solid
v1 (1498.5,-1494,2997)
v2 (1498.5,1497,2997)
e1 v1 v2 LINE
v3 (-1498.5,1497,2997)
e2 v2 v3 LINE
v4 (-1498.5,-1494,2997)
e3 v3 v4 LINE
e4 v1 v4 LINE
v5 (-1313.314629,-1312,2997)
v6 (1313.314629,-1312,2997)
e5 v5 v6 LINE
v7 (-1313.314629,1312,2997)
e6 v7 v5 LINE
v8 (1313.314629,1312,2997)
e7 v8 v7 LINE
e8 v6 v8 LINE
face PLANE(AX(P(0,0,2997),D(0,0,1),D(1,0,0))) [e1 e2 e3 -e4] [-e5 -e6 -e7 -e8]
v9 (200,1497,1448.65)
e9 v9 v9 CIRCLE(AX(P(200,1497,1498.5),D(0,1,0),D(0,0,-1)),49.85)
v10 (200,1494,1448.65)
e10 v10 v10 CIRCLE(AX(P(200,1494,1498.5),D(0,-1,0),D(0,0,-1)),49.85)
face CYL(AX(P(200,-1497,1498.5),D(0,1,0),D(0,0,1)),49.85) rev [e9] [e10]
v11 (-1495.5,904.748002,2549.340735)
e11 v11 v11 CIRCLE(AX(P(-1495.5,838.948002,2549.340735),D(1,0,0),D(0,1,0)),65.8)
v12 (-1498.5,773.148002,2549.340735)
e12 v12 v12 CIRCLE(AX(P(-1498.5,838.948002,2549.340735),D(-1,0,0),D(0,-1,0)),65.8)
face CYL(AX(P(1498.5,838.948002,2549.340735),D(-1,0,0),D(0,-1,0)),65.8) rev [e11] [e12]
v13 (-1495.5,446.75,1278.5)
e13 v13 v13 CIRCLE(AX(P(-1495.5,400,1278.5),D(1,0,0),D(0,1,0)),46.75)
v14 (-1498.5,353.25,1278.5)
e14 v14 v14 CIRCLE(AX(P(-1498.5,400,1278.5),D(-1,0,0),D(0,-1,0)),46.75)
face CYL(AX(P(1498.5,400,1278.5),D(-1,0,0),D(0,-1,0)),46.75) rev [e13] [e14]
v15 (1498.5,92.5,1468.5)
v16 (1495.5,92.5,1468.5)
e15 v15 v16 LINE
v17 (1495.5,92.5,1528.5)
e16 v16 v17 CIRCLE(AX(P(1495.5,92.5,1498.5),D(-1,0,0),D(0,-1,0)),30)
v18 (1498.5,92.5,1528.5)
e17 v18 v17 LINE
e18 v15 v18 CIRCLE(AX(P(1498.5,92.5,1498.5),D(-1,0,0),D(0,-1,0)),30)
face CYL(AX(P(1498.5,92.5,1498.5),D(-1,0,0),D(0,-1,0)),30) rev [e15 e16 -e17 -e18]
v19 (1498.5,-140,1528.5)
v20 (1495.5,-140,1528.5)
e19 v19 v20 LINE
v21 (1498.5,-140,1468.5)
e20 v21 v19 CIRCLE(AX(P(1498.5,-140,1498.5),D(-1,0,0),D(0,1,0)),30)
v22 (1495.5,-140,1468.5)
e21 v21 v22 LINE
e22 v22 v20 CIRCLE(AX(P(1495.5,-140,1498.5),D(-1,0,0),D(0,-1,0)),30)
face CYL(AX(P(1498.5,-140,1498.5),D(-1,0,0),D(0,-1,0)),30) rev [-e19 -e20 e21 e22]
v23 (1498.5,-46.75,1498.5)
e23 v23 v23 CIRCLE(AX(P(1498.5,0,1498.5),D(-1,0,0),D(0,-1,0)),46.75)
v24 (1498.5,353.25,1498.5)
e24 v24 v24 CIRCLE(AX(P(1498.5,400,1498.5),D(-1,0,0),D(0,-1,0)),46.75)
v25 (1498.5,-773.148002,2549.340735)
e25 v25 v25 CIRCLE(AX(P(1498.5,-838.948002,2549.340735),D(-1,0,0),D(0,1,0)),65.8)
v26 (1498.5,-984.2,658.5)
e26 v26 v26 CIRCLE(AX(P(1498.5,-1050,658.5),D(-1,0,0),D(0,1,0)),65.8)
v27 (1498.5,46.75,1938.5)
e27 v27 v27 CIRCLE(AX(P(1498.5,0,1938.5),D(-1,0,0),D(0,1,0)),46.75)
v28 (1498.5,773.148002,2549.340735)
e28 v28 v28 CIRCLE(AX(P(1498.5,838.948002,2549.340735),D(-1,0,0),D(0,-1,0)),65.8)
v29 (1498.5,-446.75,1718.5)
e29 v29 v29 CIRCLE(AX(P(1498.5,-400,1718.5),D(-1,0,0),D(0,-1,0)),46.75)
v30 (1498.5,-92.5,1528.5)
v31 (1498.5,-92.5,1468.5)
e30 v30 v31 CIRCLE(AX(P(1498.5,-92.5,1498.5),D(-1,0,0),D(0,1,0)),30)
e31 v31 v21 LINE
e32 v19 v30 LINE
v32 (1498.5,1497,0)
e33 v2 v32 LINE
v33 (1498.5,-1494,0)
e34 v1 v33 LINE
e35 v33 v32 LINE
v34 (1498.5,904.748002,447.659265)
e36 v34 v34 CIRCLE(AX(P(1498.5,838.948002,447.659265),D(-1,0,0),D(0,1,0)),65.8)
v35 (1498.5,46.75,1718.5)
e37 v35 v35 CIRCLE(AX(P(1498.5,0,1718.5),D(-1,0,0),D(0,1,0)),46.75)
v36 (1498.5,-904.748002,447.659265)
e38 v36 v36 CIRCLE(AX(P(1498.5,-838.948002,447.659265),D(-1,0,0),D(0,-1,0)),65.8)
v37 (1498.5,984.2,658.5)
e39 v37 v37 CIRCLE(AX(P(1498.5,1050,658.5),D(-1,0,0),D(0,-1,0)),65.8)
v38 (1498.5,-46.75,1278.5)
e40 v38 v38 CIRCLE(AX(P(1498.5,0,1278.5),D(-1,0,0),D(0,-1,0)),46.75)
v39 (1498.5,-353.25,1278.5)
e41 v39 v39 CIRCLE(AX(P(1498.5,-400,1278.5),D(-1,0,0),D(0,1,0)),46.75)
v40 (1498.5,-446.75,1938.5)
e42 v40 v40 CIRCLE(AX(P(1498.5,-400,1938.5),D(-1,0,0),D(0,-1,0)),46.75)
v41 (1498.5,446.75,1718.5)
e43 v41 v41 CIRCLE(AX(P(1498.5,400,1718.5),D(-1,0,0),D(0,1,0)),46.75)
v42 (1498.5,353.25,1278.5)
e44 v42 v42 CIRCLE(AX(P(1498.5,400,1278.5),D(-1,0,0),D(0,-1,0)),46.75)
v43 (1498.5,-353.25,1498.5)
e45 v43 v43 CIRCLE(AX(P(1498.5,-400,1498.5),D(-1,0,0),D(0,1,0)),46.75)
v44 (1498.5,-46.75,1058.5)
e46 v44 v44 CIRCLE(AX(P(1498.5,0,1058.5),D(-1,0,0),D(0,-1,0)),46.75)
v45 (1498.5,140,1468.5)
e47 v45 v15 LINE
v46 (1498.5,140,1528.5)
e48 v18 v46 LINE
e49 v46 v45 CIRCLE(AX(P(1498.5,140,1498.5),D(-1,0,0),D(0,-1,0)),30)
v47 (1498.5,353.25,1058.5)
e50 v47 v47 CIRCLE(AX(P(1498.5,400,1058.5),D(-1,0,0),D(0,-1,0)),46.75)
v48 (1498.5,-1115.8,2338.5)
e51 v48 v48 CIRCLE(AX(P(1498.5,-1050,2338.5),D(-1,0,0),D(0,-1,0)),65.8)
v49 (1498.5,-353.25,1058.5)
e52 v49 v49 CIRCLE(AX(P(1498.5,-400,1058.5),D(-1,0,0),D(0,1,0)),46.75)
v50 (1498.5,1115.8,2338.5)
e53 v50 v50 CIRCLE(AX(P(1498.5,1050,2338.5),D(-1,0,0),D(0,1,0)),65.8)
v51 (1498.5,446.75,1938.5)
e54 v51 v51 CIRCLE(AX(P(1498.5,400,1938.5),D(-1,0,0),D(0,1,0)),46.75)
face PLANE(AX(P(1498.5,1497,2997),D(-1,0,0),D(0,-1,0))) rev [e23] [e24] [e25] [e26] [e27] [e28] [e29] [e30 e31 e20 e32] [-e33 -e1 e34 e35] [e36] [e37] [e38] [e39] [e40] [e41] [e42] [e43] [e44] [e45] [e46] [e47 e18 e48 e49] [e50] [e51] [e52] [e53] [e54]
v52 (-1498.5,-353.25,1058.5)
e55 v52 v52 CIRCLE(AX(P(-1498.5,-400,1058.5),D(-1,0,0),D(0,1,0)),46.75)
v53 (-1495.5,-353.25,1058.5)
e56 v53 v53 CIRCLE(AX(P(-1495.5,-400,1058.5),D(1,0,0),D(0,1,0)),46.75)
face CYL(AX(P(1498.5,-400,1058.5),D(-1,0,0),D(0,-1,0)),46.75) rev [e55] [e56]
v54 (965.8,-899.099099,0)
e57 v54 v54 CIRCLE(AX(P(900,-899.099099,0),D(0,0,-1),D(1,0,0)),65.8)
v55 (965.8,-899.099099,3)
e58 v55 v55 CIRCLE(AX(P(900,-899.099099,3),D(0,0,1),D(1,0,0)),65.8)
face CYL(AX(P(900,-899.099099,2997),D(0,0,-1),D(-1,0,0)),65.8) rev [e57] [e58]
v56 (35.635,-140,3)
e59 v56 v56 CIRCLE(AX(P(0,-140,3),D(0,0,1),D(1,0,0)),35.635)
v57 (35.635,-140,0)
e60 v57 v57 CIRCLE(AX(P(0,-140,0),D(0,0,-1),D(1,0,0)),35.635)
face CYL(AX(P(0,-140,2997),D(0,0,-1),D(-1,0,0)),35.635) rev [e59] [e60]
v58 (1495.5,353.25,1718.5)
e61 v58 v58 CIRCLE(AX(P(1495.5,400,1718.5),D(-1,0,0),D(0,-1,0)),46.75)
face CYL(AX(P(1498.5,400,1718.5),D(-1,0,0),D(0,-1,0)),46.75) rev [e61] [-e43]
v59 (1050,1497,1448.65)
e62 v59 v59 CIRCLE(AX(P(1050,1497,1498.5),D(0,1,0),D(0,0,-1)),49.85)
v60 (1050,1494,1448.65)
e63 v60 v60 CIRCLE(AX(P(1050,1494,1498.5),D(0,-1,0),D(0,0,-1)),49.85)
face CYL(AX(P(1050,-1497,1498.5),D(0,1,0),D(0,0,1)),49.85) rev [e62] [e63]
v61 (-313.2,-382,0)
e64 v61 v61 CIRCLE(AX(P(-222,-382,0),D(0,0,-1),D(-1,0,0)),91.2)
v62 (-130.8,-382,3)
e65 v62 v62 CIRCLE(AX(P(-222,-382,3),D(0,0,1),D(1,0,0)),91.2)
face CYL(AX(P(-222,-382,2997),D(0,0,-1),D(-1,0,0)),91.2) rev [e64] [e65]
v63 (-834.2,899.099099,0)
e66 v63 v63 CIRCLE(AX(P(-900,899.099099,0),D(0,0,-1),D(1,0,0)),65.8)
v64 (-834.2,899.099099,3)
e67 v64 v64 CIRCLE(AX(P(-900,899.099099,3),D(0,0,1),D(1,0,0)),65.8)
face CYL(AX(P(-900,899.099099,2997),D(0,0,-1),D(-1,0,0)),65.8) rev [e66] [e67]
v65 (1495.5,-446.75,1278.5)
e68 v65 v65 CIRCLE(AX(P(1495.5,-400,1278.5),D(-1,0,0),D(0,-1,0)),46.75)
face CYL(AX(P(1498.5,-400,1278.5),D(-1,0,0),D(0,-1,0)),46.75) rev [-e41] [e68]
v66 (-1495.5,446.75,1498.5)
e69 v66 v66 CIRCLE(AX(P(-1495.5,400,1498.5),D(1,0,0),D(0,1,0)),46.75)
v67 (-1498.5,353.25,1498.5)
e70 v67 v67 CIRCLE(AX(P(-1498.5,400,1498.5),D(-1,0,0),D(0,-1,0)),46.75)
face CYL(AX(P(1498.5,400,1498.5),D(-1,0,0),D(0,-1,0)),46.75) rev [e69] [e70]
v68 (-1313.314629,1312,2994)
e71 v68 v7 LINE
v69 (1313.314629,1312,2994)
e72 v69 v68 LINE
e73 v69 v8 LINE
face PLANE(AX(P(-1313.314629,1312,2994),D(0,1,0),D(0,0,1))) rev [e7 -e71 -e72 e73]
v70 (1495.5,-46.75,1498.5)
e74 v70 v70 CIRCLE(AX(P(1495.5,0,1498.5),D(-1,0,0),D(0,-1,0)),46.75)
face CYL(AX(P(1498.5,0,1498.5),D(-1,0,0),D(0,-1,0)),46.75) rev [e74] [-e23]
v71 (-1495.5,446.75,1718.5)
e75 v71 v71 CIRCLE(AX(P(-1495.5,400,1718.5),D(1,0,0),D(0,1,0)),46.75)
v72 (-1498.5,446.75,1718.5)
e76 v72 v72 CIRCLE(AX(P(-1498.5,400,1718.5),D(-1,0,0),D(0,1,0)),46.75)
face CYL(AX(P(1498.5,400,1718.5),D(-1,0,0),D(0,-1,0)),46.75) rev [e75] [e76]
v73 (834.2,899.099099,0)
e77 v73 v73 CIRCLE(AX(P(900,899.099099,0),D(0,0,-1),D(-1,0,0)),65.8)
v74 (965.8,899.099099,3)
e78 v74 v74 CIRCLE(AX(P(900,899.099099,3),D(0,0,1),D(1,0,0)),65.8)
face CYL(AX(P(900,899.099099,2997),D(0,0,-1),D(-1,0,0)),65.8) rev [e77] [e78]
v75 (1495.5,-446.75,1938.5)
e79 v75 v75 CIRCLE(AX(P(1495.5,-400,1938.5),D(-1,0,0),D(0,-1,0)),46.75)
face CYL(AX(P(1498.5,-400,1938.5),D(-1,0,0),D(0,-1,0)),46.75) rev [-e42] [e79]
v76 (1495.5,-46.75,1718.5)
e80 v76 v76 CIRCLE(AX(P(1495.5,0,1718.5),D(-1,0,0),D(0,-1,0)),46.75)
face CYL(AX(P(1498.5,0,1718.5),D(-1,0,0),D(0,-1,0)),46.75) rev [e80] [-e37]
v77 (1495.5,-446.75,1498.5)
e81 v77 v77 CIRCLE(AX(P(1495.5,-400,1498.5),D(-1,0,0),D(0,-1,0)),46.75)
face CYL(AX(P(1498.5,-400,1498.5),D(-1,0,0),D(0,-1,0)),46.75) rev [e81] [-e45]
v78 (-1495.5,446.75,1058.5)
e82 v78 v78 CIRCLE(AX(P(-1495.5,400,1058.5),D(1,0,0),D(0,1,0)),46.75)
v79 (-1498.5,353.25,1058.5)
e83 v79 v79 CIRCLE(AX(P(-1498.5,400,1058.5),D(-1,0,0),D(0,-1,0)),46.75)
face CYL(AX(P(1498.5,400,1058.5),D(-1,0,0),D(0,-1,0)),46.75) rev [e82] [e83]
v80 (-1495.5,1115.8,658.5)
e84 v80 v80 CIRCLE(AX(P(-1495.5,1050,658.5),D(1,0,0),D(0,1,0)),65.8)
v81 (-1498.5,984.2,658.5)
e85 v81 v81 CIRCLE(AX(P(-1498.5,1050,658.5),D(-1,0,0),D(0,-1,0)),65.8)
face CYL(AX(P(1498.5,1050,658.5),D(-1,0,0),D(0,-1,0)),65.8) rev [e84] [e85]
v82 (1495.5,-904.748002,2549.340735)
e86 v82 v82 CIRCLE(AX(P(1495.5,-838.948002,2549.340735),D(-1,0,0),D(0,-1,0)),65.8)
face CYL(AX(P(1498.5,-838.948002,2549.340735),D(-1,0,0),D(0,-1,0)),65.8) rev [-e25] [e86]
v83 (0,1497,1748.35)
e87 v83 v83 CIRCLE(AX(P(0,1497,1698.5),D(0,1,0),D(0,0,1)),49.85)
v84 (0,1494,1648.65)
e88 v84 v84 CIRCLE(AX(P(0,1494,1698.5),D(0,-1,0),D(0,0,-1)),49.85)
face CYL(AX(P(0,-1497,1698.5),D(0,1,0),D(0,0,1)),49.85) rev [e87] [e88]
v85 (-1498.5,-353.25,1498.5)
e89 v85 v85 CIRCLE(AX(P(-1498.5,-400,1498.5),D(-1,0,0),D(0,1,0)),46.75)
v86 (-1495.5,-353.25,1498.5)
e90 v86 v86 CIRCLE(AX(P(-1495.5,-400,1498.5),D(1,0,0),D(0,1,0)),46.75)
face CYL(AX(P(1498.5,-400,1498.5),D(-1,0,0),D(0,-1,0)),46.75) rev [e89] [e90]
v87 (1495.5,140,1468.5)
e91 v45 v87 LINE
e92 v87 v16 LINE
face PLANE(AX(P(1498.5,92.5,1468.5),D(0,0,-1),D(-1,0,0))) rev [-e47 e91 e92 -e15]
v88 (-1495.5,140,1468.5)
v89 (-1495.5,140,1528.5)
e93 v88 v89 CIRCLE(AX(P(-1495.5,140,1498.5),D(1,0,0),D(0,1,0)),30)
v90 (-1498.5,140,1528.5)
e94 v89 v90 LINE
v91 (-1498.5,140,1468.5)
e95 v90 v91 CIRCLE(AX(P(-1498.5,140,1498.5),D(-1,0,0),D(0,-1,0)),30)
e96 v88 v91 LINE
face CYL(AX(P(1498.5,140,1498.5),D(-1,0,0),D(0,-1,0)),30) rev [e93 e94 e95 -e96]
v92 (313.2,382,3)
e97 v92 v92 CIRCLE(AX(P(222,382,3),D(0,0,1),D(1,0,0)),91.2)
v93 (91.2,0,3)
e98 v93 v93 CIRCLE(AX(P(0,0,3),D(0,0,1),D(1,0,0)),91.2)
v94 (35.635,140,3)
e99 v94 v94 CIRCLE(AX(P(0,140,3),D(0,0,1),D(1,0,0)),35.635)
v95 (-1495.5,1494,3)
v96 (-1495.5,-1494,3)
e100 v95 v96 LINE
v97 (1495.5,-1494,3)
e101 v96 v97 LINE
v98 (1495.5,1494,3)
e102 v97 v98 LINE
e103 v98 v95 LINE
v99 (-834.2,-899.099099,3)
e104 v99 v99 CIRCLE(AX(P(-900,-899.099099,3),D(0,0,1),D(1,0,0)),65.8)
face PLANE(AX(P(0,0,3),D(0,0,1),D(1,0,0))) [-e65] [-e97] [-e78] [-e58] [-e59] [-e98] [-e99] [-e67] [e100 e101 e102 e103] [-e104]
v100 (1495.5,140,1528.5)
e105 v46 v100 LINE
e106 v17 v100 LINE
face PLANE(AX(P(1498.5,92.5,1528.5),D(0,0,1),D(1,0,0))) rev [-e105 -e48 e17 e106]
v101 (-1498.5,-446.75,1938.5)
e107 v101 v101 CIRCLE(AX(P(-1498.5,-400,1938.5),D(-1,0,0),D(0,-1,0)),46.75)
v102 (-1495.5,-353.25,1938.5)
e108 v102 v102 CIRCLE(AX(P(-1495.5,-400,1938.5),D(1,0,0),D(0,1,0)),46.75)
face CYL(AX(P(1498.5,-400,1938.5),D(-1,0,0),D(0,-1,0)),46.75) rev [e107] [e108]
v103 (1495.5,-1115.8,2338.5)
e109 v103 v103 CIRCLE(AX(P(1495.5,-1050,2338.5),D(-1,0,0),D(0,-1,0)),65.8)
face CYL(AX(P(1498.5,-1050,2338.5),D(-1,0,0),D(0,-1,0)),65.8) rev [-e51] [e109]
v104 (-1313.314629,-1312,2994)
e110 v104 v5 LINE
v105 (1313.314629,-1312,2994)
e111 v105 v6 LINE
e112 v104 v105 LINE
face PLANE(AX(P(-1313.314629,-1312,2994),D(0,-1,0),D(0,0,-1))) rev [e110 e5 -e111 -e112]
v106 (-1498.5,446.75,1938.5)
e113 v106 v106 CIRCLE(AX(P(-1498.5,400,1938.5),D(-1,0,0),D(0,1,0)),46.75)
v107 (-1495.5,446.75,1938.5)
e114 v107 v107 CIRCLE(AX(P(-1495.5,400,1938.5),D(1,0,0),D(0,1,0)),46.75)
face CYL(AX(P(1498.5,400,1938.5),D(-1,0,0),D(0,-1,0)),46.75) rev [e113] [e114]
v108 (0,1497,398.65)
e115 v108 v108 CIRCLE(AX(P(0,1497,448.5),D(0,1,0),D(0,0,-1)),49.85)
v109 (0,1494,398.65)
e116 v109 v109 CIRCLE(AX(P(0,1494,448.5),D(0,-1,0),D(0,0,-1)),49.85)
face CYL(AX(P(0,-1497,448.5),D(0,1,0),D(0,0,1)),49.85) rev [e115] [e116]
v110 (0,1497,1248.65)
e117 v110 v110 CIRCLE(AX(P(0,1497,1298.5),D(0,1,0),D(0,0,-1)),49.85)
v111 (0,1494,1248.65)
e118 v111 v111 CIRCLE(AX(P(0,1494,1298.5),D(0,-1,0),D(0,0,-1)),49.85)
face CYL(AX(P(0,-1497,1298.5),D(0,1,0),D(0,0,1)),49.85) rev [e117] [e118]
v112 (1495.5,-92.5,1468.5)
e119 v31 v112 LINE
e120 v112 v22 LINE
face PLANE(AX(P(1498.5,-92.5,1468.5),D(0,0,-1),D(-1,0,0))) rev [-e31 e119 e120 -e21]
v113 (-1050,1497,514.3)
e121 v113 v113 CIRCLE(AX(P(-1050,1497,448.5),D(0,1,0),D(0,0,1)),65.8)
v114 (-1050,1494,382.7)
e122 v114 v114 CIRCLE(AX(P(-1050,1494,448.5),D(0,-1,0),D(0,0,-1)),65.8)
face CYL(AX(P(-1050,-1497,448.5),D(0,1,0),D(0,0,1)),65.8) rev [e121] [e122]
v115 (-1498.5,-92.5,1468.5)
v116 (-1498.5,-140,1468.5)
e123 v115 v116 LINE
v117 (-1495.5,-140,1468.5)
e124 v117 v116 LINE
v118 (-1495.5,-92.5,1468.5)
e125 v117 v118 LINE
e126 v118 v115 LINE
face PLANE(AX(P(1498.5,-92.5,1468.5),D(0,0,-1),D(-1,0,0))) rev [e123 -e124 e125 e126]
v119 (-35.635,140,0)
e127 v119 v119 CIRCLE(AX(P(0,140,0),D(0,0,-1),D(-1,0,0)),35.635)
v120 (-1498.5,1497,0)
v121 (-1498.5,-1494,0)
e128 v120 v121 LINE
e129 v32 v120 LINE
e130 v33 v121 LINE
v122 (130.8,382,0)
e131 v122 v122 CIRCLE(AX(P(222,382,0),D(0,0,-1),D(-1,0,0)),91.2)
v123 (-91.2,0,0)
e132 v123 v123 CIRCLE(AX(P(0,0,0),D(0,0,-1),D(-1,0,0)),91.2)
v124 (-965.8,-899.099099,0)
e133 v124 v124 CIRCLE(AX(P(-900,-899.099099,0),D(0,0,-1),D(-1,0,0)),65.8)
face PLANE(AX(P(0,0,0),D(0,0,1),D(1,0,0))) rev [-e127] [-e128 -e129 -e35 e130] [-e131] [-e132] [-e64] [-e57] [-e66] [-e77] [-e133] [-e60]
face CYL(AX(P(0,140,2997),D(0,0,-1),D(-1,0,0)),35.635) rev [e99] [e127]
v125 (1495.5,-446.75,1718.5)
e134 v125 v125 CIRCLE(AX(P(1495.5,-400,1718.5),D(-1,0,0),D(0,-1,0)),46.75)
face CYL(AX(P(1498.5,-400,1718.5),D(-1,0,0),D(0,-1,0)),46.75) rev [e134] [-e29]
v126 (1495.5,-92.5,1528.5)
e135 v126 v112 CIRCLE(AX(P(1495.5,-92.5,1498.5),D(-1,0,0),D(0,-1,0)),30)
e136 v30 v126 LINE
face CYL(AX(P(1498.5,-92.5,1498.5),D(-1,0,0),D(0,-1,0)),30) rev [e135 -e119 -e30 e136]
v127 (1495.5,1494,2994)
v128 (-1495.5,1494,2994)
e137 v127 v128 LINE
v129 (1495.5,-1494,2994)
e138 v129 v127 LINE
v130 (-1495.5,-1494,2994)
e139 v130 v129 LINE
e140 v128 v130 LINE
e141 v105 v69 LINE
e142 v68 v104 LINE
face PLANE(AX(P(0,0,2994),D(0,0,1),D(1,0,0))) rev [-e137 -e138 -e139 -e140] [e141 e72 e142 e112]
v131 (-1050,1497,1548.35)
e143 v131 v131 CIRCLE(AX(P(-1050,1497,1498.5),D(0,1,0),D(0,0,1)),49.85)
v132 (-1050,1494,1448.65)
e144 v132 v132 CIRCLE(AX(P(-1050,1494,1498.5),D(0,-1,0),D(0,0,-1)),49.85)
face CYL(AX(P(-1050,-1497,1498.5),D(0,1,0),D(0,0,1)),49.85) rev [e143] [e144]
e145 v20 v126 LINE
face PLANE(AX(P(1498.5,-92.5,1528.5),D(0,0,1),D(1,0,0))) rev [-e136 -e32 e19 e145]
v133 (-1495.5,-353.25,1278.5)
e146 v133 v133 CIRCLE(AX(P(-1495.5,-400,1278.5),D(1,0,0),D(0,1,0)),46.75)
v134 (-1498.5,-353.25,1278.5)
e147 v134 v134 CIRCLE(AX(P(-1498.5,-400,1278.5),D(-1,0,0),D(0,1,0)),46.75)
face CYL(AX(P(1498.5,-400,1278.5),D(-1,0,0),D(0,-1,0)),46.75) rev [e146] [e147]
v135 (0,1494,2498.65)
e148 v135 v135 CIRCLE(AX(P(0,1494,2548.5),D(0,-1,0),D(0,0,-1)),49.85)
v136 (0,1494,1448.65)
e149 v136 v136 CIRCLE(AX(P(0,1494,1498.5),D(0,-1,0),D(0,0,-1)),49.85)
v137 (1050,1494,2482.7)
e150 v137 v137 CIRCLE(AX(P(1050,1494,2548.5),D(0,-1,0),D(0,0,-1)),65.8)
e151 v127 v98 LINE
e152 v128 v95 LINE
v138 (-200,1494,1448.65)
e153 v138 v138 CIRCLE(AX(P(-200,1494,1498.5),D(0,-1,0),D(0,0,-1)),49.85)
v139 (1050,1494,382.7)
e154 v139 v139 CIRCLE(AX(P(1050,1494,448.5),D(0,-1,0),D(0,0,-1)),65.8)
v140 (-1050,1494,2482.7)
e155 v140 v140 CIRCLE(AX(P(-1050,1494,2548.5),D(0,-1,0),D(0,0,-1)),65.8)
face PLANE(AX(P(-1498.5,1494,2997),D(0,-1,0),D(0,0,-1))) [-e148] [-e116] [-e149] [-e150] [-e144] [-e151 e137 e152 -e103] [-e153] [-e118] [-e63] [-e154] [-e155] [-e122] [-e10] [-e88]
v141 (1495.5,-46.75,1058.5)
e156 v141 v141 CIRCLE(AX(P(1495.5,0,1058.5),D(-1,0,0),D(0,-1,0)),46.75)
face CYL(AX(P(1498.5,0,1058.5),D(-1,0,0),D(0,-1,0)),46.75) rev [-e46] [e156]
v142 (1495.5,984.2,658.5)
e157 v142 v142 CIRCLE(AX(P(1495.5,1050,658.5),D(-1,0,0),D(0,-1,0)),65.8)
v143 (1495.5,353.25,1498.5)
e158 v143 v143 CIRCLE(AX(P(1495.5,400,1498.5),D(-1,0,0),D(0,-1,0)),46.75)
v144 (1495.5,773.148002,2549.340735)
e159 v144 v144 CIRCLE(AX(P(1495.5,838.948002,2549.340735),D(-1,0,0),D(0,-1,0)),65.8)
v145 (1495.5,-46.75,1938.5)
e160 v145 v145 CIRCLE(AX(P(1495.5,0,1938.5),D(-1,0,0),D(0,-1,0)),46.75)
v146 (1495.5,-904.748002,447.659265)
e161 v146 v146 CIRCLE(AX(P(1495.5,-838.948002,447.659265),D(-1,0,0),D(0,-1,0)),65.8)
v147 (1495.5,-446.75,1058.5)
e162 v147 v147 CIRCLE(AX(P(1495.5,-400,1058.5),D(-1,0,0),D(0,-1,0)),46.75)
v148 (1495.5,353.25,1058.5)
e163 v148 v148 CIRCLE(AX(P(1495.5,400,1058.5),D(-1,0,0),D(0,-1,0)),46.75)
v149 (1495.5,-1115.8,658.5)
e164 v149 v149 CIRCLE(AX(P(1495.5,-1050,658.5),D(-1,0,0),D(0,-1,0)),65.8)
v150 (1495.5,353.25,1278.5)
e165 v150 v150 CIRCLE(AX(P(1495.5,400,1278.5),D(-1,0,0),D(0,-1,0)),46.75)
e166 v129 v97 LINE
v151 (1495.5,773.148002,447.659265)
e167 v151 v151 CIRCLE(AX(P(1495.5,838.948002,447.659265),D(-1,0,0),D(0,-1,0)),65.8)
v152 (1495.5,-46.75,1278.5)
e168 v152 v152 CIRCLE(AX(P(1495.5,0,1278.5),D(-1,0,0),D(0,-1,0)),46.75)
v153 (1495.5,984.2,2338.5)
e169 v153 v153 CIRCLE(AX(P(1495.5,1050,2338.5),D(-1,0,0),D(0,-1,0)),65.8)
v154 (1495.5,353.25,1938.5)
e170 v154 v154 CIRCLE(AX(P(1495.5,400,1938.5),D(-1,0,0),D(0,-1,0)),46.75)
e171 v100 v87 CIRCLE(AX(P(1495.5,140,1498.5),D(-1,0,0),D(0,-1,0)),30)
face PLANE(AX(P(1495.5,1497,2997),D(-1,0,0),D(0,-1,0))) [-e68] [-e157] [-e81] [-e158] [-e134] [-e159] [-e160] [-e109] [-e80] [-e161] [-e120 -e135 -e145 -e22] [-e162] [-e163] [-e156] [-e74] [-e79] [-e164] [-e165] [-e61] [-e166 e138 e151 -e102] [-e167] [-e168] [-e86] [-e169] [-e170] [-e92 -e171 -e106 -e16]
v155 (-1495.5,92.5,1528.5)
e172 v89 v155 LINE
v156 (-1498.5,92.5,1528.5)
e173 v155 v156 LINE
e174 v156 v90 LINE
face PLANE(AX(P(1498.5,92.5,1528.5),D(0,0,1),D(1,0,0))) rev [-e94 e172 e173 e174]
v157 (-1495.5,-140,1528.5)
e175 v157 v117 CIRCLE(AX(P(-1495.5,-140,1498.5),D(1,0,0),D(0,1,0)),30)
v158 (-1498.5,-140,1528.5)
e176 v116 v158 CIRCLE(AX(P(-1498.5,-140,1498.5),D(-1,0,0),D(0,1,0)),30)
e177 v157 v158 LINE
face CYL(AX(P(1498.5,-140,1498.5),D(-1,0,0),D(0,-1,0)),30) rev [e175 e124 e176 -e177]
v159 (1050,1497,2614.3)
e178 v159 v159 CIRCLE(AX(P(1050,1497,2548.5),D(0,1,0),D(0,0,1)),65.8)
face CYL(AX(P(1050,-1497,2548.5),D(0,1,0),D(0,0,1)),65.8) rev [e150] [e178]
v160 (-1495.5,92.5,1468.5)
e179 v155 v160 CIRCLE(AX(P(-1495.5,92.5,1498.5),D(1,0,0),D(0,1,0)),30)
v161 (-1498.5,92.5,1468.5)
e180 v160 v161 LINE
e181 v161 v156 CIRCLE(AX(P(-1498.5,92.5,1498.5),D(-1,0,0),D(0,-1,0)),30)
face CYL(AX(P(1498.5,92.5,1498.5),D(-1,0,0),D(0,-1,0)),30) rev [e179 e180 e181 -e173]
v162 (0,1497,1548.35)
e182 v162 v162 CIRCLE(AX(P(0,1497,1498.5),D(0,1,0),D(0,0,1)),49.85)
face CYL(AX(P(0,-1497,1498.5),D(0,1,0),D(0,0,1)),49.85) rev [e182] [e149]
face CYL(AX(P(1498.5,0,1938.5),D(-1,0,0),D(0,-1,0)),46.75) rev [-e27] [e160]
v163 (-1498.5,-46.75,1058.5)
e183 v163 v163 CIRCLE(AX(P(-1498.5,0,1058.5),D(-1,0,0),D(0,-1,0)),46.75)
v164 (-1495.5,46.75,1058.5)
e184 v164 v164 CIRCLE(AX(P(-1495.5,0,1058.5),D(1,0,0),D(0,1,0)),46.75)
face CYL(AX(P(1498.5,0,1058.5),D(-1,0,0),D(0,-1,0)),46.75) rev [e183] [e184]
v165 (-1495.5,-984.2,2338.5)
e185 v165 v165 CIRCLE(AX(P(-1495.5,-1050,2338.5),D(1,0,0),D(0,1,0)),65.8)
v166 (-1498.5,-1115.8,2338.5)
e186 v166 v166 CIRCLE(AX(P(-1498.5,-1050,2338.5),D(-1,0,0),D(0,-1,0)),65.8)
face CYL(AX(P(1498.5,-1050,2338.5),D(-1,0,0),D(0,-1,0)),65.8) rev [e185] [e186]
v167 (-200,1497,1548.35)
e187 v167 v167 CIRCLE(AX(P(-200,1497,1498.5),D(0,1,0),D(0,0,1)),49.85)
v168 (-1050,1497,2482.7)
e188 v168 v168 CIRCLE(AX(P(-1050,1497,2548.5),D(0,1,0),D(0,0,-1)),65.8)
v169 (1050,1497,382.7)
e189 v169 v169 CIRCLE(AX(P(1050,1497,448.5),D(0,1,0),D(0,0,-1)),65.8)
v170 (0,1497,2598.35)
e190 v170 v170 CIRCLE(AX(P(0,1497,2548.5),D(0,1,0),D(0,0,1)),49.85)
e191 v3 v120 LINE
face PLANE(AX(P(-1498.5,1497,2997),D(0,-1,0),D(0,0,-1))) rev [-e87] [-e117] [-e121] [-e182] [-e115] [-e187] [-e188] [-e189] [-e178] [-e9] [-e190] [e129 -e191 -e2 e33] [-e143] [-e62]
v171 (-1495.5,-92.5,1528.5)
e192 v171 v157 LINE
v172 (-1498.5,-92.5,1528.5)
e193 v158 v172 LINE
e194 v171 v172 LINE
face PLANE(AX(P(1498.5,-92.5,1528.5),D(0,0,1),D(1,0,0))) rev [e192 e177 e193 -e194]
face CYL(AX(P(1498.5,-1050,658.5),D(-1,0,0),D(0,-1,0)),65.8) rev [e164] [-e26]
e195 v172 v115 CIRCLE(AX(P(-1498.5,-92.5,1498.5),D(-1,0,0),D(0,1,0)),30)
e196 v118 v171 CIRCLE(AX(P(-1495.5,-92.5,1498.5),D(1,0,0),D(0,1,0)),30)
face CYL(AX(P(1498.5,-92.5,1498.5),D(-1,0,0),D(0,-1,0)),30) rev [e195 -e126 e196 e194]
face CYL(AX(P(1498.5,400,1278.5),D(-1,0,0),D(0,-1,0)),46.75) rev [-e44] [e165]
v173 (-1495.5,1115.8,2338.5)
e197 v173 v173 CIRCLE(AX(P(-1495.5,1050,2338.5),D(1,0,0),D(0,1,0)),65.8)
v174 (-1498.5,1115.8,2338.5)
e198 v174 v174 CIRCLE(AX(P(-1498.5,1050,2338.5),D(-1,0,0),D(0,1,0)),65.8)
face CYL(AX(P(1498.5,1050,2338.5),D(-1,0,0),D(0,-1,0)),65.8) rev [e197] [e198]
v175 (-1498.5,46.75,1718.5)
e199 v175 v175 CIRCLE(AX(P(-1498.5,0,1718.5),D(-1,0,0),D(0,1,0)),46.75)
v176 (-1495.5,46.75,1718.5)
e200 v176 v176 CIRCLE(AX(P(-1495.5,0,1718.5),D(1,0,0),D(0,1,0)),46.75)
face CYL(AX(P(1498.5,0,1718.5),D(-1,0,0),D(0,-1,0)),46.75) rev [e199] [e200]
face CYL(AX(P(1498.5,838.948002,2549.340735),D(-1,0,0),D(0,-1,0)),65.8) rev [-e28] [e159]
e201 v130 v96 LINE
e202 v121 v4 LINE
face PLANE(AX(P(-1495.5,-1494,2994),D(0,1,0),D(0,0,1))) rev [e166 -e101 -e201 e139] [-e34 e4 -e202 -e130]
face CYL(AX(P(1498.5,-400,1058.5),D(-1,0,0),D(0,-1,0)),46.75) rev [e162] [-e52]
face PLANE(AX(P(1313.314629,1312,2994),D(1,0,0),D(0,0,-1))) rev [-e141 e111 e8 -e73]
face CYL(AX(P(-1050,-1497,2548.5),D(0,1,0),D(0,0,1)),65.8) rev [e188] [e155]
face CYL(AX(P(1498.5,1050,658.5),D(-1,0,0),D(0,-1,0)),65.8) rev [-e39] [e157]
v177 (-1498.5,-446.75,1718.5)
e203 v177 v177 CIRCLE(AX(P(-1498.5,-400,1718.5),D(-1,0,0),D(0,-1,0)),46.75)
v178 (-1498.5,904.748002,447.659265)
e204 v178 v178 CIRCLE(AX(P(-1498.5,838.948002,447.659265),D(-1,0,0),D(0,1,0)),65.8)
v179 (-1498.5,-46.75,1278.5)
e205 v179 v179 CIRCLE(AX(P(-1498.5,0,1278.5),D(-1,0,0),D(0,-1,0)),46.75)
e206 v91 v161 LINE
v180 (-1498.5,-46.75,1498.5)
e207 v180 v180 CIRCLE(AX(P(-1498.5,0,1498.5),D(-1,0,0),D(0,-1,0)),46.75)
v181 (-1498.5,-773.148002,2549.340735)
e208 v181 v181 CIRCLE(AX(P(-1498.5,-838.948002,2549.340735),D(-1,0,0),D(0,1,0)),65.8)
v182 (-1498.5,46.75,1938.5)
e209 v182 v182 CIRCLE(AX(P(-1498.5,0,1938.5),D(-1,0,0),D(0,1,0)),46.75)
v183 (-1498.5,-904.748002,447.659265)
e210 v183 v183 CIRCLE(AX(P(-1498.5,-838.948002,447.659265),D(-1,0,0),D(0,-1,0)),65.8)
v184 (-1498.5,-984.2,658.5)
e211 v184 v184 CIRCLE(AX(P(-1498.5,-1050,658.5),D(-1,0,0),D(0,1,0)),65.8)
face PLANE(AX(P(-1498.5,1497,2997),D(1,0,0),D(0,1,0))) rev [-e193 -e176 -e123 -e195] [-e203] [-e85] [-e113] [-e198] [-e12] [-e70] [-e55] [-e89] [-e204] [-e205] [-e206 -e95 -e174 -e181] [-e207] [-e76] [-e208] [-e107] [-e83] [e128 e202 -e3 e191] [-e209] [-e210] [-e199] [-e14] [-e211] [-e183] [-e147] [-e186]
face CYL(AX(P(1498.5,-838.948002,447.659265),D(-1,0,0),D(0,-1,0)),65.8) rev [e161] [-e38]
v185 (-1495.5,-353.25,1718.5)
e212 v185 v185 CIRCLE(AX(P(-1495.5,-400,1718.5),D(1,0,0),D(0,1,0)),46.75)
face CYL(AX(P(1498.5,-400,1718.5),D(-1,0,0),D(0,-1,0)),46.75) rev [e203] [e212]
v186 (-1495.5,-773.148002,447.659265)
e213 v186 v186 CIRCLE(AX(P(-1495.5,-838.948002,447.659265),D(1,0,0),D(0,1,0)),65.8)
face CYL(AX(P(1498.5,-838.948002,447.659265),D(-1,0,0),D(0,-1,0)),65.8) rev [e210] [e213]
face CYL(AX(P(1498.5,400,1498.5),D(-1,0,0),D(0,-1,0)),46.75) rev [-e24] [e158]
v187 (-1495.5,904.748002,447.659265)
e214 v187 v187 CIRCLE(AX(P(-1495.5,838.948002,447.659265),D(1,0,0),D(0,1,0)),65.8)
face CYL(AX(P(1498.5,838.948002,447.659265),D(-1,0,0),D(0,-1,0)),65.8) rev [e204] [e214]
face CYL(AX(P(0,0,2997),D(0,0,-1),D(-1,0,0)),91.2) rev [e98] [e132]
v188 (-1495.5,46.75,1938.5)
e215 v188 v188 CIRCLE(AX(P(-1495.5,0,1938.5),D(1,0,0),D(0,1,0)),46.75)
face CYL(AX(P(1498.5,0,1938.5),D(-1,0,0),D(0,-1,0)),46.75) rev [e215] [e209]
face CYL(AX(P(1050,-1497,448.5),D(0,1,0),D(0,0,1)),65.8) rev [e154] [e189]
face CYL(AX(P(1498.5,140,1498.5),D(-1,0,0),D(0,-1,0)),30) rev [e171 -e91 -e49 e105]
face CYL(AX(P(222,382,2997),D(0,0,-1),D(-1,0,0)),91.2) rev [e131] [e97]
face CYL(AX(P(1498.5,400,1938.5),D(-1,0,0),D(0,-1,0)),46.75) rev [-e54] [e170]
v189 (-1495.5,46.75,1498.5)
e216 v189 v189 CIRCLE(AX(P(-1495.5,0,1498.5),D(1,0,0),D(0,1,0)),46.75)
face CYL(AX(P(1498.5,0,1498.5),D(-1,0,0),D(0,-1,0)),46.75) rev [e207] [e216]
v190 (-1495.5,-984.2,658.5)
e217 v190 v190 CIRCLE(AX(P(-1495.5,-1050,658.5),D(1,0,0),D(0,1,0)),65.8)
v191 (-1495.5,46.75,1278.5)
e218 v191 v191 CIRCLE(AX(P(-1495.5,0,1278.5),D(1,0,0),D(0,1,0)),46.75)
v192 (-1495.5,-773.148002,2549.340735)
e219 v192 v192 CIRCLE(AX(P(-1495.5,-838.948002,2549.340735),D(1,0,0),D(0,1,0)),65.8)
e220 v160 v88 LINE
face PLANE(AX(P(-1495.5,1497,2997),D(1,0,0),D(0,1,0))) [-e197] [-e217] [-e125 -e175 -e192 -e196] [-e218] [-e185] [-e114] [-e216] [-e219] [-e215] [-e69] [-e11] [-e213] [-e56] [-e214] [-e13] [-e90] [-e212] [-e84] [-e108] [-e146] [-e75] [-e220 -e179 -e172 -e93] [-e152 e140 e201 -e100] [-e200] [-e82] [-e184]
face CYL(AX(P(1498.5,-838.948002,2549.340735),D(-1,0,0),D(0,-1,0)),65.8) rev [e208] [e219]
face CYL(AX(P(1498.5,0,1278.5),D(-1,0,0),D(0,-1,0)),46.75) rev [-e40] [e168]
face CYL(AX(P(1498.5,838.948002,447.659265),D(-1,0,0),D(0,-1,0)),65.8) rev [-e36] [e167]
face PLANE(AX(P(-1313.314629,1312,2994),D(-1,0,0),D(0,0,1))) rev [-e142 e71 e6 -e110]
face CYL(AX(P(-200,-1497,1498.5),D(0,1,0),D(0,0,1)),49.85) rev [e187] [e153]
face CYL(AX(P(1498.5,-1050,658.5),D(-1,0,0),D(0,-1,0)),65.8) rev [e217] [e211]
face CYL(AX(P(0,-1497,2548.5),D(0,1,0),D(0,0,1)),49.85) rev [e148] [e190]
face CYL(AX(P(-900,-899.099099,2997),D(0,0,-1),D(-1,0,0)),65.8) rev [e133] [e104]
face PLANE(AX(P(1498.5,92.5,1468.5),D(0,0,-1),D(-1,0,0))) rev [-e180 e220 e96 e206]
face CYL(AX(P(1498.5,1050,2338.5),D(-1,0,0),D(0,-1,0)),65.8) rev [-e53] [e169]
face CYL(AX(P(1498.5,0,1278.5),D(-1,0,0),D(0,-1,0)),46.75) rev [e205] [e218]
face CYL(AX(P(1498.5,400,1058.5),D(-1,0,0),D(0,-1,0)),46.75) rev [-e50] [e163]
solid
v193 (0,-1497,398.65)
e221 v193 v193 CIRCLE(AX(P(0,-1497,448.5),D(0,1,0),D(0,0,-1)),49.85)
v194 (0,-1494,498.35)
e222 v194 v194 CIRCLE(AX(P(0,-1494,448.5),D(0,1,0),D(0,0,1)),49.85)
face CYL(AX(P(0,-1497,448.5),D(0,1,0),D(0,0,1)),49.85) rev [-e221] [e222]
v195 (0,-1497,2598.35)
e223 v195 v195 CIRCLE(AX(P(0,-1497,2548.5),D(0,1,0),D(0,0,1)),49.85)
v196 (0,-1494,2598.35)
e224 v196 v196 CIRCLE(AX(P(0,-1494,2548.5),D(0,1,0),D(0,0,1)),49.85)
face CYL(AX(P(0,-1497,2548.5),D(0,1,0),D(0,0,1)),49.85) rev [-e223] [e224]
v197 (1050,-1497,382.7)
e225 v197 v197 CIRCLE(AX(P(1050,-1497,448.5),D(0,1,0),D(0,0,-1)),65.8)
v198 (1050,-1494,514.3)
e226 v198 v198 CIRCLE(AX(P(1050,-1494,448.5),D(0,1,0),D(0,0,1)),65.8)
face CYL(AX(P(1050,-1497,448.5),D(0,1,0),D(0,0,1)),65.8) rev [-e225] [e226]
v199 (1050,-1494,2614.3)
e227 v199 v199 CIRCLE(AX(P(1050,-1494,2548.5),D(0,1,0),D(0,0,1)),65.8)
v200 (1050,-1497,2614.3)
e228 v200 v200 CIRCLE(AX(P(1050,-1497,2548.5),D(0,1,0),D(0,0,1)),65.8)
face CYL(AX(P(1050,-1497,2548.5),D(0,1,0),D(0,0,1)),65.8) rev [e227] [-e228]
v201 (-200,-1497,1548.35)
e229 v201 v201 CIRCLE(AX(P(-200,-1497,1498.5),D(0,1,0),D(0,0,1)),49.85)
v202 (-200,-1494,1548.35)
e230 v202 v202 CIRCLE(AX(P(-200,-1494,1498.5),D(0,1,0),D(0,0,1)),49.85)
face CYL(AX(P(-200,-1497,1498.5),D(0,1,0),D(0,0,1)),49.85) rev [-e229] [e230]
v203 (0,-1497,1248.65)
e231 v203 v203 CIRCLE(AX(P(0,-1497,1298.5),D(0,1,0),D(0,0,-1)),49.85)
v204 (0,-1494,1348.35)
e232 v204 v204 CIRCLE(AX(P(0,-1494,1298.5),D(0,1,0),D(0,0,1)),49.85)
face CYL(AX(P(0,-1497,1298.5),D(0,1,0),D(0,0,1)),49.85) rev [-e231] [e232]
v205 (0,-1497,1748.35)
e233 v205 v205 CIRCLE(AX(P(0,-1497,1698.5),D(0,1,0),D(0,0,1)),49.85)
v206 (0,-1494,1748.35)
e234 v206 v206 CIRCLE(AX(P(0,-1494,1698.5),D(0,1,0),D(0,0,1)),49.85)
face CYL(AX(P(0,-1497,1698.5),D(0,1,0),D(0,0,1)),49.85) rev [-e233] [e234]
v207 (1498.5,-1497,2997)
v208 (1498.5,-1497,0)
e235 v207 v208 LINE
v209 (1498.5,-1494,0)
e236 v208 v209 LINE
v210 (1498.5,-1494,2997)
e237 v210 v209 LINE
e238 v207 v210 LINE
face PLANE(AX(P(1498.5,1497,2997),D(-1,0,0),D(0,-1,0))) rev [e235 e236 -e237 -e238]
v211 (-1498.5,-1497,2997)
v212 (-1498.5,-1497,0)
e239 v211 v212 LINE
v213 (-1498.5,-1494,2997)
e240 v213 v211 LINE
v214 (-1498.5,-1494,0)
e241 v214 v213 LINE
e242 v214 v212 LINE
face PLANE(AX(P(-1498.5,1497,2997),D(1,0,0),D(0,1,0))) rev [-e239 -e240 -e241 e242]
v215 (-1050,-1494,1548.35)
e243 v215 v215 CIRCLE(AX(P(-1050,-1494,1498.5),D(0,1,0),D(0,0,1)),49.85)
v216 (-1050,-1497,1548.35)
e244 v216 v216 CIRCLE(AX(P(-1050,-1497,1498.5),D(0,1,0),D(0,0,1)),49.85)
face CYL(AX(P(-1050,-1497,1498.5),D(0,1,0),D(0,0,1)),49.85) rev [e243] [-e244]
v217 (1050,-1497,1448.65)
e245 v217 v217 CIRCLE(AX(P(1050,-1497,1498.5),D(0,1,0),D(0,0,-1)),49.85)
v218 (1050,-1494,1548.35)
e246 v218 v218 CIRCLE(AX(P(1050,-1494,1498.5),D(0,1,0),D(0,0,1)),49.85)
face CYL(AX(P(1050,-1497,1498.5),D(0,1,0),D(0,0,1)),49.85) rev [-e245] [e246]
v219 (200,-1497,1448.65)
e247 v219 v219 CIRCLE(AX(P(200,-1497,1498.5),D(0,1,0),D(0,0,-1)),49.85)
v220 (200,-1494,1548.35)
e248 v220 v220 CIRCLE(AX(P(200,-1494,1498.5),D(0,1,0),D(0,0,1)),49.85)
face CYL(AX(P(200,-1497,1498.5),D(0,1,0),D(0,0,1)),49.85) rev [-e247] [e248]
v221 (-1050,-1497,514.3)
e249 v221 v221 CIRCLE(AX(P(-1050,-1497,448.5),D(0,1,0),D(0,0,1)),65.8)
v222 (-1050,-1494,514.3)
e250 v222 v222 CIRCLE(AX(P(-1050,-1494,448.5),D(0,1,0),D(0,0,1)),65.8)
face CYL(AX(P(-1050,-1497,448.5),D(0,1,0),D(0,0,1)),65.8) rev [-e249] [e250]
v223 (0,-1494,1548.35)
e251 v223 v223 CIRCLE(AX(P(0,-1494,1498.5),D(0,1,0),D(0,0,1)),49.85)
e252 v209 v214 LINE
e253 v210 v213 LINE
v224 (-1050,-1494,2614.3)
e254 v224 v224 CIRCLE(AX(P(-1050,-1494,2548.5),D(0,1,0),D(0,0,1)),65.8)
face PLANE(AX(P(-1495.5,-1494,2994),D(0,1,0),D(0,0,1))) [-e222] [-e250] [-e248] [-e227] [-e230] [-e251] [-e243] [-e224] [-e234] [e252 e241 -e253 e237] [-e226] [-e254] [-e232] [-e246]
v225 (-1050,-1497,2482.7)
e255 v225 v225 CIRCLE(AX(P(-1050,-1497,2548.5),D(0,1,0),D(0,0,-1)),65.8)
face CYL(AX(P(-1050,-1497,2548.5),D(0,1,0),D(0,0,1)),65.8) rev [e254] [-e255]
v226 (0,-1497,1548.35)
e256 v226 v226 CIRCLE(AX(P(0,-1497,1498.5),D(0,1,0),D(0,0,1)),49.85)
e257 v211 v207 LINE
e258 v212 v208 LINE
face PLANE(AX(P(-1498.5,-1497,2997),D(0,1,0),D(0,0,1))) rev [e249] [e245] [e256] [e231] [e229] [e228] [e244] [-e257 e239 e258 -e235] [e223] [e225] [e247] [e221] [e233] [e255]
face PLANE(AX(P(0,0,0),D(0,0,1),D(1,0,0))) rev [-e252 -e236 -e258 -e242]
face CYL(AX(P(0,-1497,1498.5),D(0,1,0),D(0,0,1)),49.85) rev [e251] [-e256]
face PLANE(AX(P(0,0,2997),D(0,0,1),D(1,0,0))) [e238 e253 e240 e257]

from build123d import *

# Parameters (mm, degrees)
SKETCH1_W           = 2997
SKETCH1_H           = 2994
BOSS_EXTRUDE1_DEPTH = 2997
SHELL1_T            = -3
SKETCH2_W           = 2997
SKETCH2_H           = 2994
SKETCH2_W_2         = 2626.629258518
SKETCH2_H_2         = 2624
BOSS_EXTRUDE2_DEPTH = 3
SKETCH3_R           = 46.75
SKETCH3_R_2         = 65.8
CUT_EXTRUDE1_DEPTH  = 4496.000222469
SKETCH4_R           = 49.85
SKETCH4_R_2         = 65.8
CUT_EXTRUDE2_DEPTH  = 4494.500556359
SKETCH5_R           = 91.2
SKETCH5_R_2         = 35.635
SKETCH5_R_3         = 65.8
CUT_EXTRUDE3_DEPTH  = 3670.948262578


with BuildPart() as part:
    # Sketch1 → Boss-Extrude1 (new body)
    with BuildSketch(Plane.XY):
        Rectangle(SKETCH1_W, SKETCH1_H)
    extrude(amount=BOSS_EXTRUDE1_DEPTH)

    # Shell1
    shell1_openings = [part.faces().sort_by_distance(p)[0] for p in [
        (0, 0, 2997),
    ]]
    offset(amount=SHELL1_T, openings=shell1_openings, kind=Kind.INTERSECTION)

    # Sketch2 → Boss-Extrude2 (add)
    with BuildSketch(Plane.XY.offset(2997)):
        Rectangle(SKETCH2_W, SKETCH2_H)
        Rectangle(SKETCH2_W_2, SKETCH2_H_2, mode=Mode.SUBTRACT)
    extrude(amount=-BOSS_EXTRUDE2_DEPTH)

    # Sketch3 → Cut-Extrude1 (cut, through all)
    with BuildSketch(Plane.ZY.offset(1498.5)):
        with Locations((1498.5, 0)):
            Circle(SKETCH3_R)
        with Locations((1278.5, 0)):
            Circle(SKETCH3_R)
        with Locations((1058.5, 0)):
            Circle(SKETCH3_R)
        with Locations((1058.5, 400)):
            Circle(SKETCH3_R)
        with Locations((1278.5, 400)):
            Circle(SKETCH3_R)
        with Locations((1498.5, 400)):
            Circle(SKETCH3_R)
        with Locations((658.5, 1050)):
            Circle(SKETCH3_R_2)
        with Locations((447.659264897, 838.948001635)):
            Circle(SKETCH3_R_2)
        with Locations((1718.5, 400)):
            Circle(SKETCH3_R)
        with Locations((1718.5, 0)):
            Circle(SKETCH3_R)
        with Locations((1938.5, 0)):
            Circle(SKETCH3_R)
        with Locations((1938.5, 400)):
            Circle(SKETCH3_R)
        with Locations((2549.340735103, 838.948001635)):
            Circle(SKETCH3_R_2)
        with Locations((2338.5, 1050)):
            Circle(SKETCH3_R_2)
        with Locations((1058.5, -400)):
            Circle(SKETCH3_R)
        with Locations((1278.5, -400)):
            Circle(SKETCH3_R)
        with Locations((1498.5, -400)):
            Circle(SKETCH3_R)
        with Locations((1718.5, -400)):
            Circle(SKETCH3_R)
        with Locations((1938.5, -400)):
            Circle(SKETCH3_R)
        with Locations((2549.340735103, -838.948001635)):
            Circle(SKETCH3_R_2)
        with Locations((2338.5, -1050)):
            Circle(SKETCH3_R_2)
        with Locations((658.5, -1050)):
            Circle(SKETCH3_R_2)
        with Locations((447.659264897, -838.948001635)):
            Circle(SKETCH3_R_2)
        with BuildLine():
            Line((1468.5, 92.5), (1468.5, 140))
            ThreePointArc((1468.5, 140), (1498.5, 170), (1528.5, 140))
            Line((1528.5, 140), (1528.5, 92.5))
            ThreePointArc((1528.5, 92.5), (1498.5, 62.5), (1468.5, 92.5))
        make_face()
        with BuildLine():
            Line((1468.5, -92.5), (1468.5, -140))
            ThreePointArc((1468.5, -140), (1498.5, -170), (1528.5, -140))
            Line((1528.5, -140), (1528.5, -92.5))
            ThreePointArc((1528.5, -92.5), (1498.5, -62.5), (1468.5, -92.5))
        make_face()
    extrude(amount=-CUT_EXTRUDE1_DEPTH, mode=Mode.SUBTRACT)

    # Sketch4 → Cut-Extrude2 (cut, through all)
    with BuildSketch(Plane(origin=(0, 1497, 0), x_dir=(1, 0, 0), z_dir=(0, 1, 0))):
        with Locations((0, -1498.5)):
            Circle(SKETCH4_R)
        with Locations((-200, -1498.5)):
            Circle(SKETCH4_R)
        with Locations((-1050, -1498.5)):
            Circle(SKETCH4_R)
        with Locations((-1050, -448.5)):
            Circle(SKETCH4_R_2)
        with Locations((200, -1498.5)):
            Circle(SKETCH4_R)
        with Locations((1050, -1498.5)):
            Circle(SKETCH4_R)
        with Locations((1050, -448.5)):
            Circle(SKETCH4_R_2)
        with Locations((0, -2548.5)):
            Circle(SKETCH4_R)
        with Locations((0, -1698.5)):
            Circle(SKETCH4_R)
        with Locations((0, -1298.5)):
            Circle(SKETCH4_R)
        with Locations((0, -448.5)):
            Circle(SKETCH4_R)
        with Locations((1050, -2548.5)):
            Circle(SKETCH4_R_2)
        with Locations((-1050, -2548.5)):
            Circle(SKETCH4_R_2)
    extrude(amount=-CUT_EXTRUDE2_DEPTH, mode=Mode.SUBTRACT)

    # Sketch5 → Cut-Extrude3 (cut, through all)
    with BuildSketch(Plane(origin=(0, 0, 0), x_dir=(-1, 0, 0), z_dir=(0, 0, -1))):
        Circle(SKETCH5_R)
        with Locations((0, 140)):
            Circle(SKETCH5_R_2)
        with Locations((-222, 382)):
            Circle(SKETCH5_R)
        with Locations((222, -382)):
            Circle(SKETCH5_R)
        with Locations((-900, 899.099099099)):
            Circle(SKETCH5_R_3)
        with Locations((0, -140)):
            Circle(SKETCH5_R_2)
        with Locations((-900, -899.099099099)):
            Circle(SKETCH5_R_3)
        with Locations((900, -899.099099099)):
            Circle(SKETCH5_R_3)
        with Locations((900, 899.099099099)):
            Circle(SKETCH5_R_3)
    extrude(amount=-CUT_EXTRUDE3_DEPTH, mode=Mode.SUBTRACT)


with BuildPart() as body_2:
    # Split1: the piece on the far side of the plane
    add(part.part)
    split(bisect_by=Plane(origin=(-1498.5, -1494, 2997), x_dir=(0, 0, 1), z_dir=(0, 1, 0)), keep=Keep.BOTTOM)


with BuildPart() as part_1:
    add(part.part)

    # Split1
    split(bisect_by=Plane(origin=(-1498.5, -1494, 2997), x_dir=(0, 0, 1), z_dir=(0, 1, 0)), keep=Keep.TOP)


solid = Compound([body_2.part, part_1.part])
